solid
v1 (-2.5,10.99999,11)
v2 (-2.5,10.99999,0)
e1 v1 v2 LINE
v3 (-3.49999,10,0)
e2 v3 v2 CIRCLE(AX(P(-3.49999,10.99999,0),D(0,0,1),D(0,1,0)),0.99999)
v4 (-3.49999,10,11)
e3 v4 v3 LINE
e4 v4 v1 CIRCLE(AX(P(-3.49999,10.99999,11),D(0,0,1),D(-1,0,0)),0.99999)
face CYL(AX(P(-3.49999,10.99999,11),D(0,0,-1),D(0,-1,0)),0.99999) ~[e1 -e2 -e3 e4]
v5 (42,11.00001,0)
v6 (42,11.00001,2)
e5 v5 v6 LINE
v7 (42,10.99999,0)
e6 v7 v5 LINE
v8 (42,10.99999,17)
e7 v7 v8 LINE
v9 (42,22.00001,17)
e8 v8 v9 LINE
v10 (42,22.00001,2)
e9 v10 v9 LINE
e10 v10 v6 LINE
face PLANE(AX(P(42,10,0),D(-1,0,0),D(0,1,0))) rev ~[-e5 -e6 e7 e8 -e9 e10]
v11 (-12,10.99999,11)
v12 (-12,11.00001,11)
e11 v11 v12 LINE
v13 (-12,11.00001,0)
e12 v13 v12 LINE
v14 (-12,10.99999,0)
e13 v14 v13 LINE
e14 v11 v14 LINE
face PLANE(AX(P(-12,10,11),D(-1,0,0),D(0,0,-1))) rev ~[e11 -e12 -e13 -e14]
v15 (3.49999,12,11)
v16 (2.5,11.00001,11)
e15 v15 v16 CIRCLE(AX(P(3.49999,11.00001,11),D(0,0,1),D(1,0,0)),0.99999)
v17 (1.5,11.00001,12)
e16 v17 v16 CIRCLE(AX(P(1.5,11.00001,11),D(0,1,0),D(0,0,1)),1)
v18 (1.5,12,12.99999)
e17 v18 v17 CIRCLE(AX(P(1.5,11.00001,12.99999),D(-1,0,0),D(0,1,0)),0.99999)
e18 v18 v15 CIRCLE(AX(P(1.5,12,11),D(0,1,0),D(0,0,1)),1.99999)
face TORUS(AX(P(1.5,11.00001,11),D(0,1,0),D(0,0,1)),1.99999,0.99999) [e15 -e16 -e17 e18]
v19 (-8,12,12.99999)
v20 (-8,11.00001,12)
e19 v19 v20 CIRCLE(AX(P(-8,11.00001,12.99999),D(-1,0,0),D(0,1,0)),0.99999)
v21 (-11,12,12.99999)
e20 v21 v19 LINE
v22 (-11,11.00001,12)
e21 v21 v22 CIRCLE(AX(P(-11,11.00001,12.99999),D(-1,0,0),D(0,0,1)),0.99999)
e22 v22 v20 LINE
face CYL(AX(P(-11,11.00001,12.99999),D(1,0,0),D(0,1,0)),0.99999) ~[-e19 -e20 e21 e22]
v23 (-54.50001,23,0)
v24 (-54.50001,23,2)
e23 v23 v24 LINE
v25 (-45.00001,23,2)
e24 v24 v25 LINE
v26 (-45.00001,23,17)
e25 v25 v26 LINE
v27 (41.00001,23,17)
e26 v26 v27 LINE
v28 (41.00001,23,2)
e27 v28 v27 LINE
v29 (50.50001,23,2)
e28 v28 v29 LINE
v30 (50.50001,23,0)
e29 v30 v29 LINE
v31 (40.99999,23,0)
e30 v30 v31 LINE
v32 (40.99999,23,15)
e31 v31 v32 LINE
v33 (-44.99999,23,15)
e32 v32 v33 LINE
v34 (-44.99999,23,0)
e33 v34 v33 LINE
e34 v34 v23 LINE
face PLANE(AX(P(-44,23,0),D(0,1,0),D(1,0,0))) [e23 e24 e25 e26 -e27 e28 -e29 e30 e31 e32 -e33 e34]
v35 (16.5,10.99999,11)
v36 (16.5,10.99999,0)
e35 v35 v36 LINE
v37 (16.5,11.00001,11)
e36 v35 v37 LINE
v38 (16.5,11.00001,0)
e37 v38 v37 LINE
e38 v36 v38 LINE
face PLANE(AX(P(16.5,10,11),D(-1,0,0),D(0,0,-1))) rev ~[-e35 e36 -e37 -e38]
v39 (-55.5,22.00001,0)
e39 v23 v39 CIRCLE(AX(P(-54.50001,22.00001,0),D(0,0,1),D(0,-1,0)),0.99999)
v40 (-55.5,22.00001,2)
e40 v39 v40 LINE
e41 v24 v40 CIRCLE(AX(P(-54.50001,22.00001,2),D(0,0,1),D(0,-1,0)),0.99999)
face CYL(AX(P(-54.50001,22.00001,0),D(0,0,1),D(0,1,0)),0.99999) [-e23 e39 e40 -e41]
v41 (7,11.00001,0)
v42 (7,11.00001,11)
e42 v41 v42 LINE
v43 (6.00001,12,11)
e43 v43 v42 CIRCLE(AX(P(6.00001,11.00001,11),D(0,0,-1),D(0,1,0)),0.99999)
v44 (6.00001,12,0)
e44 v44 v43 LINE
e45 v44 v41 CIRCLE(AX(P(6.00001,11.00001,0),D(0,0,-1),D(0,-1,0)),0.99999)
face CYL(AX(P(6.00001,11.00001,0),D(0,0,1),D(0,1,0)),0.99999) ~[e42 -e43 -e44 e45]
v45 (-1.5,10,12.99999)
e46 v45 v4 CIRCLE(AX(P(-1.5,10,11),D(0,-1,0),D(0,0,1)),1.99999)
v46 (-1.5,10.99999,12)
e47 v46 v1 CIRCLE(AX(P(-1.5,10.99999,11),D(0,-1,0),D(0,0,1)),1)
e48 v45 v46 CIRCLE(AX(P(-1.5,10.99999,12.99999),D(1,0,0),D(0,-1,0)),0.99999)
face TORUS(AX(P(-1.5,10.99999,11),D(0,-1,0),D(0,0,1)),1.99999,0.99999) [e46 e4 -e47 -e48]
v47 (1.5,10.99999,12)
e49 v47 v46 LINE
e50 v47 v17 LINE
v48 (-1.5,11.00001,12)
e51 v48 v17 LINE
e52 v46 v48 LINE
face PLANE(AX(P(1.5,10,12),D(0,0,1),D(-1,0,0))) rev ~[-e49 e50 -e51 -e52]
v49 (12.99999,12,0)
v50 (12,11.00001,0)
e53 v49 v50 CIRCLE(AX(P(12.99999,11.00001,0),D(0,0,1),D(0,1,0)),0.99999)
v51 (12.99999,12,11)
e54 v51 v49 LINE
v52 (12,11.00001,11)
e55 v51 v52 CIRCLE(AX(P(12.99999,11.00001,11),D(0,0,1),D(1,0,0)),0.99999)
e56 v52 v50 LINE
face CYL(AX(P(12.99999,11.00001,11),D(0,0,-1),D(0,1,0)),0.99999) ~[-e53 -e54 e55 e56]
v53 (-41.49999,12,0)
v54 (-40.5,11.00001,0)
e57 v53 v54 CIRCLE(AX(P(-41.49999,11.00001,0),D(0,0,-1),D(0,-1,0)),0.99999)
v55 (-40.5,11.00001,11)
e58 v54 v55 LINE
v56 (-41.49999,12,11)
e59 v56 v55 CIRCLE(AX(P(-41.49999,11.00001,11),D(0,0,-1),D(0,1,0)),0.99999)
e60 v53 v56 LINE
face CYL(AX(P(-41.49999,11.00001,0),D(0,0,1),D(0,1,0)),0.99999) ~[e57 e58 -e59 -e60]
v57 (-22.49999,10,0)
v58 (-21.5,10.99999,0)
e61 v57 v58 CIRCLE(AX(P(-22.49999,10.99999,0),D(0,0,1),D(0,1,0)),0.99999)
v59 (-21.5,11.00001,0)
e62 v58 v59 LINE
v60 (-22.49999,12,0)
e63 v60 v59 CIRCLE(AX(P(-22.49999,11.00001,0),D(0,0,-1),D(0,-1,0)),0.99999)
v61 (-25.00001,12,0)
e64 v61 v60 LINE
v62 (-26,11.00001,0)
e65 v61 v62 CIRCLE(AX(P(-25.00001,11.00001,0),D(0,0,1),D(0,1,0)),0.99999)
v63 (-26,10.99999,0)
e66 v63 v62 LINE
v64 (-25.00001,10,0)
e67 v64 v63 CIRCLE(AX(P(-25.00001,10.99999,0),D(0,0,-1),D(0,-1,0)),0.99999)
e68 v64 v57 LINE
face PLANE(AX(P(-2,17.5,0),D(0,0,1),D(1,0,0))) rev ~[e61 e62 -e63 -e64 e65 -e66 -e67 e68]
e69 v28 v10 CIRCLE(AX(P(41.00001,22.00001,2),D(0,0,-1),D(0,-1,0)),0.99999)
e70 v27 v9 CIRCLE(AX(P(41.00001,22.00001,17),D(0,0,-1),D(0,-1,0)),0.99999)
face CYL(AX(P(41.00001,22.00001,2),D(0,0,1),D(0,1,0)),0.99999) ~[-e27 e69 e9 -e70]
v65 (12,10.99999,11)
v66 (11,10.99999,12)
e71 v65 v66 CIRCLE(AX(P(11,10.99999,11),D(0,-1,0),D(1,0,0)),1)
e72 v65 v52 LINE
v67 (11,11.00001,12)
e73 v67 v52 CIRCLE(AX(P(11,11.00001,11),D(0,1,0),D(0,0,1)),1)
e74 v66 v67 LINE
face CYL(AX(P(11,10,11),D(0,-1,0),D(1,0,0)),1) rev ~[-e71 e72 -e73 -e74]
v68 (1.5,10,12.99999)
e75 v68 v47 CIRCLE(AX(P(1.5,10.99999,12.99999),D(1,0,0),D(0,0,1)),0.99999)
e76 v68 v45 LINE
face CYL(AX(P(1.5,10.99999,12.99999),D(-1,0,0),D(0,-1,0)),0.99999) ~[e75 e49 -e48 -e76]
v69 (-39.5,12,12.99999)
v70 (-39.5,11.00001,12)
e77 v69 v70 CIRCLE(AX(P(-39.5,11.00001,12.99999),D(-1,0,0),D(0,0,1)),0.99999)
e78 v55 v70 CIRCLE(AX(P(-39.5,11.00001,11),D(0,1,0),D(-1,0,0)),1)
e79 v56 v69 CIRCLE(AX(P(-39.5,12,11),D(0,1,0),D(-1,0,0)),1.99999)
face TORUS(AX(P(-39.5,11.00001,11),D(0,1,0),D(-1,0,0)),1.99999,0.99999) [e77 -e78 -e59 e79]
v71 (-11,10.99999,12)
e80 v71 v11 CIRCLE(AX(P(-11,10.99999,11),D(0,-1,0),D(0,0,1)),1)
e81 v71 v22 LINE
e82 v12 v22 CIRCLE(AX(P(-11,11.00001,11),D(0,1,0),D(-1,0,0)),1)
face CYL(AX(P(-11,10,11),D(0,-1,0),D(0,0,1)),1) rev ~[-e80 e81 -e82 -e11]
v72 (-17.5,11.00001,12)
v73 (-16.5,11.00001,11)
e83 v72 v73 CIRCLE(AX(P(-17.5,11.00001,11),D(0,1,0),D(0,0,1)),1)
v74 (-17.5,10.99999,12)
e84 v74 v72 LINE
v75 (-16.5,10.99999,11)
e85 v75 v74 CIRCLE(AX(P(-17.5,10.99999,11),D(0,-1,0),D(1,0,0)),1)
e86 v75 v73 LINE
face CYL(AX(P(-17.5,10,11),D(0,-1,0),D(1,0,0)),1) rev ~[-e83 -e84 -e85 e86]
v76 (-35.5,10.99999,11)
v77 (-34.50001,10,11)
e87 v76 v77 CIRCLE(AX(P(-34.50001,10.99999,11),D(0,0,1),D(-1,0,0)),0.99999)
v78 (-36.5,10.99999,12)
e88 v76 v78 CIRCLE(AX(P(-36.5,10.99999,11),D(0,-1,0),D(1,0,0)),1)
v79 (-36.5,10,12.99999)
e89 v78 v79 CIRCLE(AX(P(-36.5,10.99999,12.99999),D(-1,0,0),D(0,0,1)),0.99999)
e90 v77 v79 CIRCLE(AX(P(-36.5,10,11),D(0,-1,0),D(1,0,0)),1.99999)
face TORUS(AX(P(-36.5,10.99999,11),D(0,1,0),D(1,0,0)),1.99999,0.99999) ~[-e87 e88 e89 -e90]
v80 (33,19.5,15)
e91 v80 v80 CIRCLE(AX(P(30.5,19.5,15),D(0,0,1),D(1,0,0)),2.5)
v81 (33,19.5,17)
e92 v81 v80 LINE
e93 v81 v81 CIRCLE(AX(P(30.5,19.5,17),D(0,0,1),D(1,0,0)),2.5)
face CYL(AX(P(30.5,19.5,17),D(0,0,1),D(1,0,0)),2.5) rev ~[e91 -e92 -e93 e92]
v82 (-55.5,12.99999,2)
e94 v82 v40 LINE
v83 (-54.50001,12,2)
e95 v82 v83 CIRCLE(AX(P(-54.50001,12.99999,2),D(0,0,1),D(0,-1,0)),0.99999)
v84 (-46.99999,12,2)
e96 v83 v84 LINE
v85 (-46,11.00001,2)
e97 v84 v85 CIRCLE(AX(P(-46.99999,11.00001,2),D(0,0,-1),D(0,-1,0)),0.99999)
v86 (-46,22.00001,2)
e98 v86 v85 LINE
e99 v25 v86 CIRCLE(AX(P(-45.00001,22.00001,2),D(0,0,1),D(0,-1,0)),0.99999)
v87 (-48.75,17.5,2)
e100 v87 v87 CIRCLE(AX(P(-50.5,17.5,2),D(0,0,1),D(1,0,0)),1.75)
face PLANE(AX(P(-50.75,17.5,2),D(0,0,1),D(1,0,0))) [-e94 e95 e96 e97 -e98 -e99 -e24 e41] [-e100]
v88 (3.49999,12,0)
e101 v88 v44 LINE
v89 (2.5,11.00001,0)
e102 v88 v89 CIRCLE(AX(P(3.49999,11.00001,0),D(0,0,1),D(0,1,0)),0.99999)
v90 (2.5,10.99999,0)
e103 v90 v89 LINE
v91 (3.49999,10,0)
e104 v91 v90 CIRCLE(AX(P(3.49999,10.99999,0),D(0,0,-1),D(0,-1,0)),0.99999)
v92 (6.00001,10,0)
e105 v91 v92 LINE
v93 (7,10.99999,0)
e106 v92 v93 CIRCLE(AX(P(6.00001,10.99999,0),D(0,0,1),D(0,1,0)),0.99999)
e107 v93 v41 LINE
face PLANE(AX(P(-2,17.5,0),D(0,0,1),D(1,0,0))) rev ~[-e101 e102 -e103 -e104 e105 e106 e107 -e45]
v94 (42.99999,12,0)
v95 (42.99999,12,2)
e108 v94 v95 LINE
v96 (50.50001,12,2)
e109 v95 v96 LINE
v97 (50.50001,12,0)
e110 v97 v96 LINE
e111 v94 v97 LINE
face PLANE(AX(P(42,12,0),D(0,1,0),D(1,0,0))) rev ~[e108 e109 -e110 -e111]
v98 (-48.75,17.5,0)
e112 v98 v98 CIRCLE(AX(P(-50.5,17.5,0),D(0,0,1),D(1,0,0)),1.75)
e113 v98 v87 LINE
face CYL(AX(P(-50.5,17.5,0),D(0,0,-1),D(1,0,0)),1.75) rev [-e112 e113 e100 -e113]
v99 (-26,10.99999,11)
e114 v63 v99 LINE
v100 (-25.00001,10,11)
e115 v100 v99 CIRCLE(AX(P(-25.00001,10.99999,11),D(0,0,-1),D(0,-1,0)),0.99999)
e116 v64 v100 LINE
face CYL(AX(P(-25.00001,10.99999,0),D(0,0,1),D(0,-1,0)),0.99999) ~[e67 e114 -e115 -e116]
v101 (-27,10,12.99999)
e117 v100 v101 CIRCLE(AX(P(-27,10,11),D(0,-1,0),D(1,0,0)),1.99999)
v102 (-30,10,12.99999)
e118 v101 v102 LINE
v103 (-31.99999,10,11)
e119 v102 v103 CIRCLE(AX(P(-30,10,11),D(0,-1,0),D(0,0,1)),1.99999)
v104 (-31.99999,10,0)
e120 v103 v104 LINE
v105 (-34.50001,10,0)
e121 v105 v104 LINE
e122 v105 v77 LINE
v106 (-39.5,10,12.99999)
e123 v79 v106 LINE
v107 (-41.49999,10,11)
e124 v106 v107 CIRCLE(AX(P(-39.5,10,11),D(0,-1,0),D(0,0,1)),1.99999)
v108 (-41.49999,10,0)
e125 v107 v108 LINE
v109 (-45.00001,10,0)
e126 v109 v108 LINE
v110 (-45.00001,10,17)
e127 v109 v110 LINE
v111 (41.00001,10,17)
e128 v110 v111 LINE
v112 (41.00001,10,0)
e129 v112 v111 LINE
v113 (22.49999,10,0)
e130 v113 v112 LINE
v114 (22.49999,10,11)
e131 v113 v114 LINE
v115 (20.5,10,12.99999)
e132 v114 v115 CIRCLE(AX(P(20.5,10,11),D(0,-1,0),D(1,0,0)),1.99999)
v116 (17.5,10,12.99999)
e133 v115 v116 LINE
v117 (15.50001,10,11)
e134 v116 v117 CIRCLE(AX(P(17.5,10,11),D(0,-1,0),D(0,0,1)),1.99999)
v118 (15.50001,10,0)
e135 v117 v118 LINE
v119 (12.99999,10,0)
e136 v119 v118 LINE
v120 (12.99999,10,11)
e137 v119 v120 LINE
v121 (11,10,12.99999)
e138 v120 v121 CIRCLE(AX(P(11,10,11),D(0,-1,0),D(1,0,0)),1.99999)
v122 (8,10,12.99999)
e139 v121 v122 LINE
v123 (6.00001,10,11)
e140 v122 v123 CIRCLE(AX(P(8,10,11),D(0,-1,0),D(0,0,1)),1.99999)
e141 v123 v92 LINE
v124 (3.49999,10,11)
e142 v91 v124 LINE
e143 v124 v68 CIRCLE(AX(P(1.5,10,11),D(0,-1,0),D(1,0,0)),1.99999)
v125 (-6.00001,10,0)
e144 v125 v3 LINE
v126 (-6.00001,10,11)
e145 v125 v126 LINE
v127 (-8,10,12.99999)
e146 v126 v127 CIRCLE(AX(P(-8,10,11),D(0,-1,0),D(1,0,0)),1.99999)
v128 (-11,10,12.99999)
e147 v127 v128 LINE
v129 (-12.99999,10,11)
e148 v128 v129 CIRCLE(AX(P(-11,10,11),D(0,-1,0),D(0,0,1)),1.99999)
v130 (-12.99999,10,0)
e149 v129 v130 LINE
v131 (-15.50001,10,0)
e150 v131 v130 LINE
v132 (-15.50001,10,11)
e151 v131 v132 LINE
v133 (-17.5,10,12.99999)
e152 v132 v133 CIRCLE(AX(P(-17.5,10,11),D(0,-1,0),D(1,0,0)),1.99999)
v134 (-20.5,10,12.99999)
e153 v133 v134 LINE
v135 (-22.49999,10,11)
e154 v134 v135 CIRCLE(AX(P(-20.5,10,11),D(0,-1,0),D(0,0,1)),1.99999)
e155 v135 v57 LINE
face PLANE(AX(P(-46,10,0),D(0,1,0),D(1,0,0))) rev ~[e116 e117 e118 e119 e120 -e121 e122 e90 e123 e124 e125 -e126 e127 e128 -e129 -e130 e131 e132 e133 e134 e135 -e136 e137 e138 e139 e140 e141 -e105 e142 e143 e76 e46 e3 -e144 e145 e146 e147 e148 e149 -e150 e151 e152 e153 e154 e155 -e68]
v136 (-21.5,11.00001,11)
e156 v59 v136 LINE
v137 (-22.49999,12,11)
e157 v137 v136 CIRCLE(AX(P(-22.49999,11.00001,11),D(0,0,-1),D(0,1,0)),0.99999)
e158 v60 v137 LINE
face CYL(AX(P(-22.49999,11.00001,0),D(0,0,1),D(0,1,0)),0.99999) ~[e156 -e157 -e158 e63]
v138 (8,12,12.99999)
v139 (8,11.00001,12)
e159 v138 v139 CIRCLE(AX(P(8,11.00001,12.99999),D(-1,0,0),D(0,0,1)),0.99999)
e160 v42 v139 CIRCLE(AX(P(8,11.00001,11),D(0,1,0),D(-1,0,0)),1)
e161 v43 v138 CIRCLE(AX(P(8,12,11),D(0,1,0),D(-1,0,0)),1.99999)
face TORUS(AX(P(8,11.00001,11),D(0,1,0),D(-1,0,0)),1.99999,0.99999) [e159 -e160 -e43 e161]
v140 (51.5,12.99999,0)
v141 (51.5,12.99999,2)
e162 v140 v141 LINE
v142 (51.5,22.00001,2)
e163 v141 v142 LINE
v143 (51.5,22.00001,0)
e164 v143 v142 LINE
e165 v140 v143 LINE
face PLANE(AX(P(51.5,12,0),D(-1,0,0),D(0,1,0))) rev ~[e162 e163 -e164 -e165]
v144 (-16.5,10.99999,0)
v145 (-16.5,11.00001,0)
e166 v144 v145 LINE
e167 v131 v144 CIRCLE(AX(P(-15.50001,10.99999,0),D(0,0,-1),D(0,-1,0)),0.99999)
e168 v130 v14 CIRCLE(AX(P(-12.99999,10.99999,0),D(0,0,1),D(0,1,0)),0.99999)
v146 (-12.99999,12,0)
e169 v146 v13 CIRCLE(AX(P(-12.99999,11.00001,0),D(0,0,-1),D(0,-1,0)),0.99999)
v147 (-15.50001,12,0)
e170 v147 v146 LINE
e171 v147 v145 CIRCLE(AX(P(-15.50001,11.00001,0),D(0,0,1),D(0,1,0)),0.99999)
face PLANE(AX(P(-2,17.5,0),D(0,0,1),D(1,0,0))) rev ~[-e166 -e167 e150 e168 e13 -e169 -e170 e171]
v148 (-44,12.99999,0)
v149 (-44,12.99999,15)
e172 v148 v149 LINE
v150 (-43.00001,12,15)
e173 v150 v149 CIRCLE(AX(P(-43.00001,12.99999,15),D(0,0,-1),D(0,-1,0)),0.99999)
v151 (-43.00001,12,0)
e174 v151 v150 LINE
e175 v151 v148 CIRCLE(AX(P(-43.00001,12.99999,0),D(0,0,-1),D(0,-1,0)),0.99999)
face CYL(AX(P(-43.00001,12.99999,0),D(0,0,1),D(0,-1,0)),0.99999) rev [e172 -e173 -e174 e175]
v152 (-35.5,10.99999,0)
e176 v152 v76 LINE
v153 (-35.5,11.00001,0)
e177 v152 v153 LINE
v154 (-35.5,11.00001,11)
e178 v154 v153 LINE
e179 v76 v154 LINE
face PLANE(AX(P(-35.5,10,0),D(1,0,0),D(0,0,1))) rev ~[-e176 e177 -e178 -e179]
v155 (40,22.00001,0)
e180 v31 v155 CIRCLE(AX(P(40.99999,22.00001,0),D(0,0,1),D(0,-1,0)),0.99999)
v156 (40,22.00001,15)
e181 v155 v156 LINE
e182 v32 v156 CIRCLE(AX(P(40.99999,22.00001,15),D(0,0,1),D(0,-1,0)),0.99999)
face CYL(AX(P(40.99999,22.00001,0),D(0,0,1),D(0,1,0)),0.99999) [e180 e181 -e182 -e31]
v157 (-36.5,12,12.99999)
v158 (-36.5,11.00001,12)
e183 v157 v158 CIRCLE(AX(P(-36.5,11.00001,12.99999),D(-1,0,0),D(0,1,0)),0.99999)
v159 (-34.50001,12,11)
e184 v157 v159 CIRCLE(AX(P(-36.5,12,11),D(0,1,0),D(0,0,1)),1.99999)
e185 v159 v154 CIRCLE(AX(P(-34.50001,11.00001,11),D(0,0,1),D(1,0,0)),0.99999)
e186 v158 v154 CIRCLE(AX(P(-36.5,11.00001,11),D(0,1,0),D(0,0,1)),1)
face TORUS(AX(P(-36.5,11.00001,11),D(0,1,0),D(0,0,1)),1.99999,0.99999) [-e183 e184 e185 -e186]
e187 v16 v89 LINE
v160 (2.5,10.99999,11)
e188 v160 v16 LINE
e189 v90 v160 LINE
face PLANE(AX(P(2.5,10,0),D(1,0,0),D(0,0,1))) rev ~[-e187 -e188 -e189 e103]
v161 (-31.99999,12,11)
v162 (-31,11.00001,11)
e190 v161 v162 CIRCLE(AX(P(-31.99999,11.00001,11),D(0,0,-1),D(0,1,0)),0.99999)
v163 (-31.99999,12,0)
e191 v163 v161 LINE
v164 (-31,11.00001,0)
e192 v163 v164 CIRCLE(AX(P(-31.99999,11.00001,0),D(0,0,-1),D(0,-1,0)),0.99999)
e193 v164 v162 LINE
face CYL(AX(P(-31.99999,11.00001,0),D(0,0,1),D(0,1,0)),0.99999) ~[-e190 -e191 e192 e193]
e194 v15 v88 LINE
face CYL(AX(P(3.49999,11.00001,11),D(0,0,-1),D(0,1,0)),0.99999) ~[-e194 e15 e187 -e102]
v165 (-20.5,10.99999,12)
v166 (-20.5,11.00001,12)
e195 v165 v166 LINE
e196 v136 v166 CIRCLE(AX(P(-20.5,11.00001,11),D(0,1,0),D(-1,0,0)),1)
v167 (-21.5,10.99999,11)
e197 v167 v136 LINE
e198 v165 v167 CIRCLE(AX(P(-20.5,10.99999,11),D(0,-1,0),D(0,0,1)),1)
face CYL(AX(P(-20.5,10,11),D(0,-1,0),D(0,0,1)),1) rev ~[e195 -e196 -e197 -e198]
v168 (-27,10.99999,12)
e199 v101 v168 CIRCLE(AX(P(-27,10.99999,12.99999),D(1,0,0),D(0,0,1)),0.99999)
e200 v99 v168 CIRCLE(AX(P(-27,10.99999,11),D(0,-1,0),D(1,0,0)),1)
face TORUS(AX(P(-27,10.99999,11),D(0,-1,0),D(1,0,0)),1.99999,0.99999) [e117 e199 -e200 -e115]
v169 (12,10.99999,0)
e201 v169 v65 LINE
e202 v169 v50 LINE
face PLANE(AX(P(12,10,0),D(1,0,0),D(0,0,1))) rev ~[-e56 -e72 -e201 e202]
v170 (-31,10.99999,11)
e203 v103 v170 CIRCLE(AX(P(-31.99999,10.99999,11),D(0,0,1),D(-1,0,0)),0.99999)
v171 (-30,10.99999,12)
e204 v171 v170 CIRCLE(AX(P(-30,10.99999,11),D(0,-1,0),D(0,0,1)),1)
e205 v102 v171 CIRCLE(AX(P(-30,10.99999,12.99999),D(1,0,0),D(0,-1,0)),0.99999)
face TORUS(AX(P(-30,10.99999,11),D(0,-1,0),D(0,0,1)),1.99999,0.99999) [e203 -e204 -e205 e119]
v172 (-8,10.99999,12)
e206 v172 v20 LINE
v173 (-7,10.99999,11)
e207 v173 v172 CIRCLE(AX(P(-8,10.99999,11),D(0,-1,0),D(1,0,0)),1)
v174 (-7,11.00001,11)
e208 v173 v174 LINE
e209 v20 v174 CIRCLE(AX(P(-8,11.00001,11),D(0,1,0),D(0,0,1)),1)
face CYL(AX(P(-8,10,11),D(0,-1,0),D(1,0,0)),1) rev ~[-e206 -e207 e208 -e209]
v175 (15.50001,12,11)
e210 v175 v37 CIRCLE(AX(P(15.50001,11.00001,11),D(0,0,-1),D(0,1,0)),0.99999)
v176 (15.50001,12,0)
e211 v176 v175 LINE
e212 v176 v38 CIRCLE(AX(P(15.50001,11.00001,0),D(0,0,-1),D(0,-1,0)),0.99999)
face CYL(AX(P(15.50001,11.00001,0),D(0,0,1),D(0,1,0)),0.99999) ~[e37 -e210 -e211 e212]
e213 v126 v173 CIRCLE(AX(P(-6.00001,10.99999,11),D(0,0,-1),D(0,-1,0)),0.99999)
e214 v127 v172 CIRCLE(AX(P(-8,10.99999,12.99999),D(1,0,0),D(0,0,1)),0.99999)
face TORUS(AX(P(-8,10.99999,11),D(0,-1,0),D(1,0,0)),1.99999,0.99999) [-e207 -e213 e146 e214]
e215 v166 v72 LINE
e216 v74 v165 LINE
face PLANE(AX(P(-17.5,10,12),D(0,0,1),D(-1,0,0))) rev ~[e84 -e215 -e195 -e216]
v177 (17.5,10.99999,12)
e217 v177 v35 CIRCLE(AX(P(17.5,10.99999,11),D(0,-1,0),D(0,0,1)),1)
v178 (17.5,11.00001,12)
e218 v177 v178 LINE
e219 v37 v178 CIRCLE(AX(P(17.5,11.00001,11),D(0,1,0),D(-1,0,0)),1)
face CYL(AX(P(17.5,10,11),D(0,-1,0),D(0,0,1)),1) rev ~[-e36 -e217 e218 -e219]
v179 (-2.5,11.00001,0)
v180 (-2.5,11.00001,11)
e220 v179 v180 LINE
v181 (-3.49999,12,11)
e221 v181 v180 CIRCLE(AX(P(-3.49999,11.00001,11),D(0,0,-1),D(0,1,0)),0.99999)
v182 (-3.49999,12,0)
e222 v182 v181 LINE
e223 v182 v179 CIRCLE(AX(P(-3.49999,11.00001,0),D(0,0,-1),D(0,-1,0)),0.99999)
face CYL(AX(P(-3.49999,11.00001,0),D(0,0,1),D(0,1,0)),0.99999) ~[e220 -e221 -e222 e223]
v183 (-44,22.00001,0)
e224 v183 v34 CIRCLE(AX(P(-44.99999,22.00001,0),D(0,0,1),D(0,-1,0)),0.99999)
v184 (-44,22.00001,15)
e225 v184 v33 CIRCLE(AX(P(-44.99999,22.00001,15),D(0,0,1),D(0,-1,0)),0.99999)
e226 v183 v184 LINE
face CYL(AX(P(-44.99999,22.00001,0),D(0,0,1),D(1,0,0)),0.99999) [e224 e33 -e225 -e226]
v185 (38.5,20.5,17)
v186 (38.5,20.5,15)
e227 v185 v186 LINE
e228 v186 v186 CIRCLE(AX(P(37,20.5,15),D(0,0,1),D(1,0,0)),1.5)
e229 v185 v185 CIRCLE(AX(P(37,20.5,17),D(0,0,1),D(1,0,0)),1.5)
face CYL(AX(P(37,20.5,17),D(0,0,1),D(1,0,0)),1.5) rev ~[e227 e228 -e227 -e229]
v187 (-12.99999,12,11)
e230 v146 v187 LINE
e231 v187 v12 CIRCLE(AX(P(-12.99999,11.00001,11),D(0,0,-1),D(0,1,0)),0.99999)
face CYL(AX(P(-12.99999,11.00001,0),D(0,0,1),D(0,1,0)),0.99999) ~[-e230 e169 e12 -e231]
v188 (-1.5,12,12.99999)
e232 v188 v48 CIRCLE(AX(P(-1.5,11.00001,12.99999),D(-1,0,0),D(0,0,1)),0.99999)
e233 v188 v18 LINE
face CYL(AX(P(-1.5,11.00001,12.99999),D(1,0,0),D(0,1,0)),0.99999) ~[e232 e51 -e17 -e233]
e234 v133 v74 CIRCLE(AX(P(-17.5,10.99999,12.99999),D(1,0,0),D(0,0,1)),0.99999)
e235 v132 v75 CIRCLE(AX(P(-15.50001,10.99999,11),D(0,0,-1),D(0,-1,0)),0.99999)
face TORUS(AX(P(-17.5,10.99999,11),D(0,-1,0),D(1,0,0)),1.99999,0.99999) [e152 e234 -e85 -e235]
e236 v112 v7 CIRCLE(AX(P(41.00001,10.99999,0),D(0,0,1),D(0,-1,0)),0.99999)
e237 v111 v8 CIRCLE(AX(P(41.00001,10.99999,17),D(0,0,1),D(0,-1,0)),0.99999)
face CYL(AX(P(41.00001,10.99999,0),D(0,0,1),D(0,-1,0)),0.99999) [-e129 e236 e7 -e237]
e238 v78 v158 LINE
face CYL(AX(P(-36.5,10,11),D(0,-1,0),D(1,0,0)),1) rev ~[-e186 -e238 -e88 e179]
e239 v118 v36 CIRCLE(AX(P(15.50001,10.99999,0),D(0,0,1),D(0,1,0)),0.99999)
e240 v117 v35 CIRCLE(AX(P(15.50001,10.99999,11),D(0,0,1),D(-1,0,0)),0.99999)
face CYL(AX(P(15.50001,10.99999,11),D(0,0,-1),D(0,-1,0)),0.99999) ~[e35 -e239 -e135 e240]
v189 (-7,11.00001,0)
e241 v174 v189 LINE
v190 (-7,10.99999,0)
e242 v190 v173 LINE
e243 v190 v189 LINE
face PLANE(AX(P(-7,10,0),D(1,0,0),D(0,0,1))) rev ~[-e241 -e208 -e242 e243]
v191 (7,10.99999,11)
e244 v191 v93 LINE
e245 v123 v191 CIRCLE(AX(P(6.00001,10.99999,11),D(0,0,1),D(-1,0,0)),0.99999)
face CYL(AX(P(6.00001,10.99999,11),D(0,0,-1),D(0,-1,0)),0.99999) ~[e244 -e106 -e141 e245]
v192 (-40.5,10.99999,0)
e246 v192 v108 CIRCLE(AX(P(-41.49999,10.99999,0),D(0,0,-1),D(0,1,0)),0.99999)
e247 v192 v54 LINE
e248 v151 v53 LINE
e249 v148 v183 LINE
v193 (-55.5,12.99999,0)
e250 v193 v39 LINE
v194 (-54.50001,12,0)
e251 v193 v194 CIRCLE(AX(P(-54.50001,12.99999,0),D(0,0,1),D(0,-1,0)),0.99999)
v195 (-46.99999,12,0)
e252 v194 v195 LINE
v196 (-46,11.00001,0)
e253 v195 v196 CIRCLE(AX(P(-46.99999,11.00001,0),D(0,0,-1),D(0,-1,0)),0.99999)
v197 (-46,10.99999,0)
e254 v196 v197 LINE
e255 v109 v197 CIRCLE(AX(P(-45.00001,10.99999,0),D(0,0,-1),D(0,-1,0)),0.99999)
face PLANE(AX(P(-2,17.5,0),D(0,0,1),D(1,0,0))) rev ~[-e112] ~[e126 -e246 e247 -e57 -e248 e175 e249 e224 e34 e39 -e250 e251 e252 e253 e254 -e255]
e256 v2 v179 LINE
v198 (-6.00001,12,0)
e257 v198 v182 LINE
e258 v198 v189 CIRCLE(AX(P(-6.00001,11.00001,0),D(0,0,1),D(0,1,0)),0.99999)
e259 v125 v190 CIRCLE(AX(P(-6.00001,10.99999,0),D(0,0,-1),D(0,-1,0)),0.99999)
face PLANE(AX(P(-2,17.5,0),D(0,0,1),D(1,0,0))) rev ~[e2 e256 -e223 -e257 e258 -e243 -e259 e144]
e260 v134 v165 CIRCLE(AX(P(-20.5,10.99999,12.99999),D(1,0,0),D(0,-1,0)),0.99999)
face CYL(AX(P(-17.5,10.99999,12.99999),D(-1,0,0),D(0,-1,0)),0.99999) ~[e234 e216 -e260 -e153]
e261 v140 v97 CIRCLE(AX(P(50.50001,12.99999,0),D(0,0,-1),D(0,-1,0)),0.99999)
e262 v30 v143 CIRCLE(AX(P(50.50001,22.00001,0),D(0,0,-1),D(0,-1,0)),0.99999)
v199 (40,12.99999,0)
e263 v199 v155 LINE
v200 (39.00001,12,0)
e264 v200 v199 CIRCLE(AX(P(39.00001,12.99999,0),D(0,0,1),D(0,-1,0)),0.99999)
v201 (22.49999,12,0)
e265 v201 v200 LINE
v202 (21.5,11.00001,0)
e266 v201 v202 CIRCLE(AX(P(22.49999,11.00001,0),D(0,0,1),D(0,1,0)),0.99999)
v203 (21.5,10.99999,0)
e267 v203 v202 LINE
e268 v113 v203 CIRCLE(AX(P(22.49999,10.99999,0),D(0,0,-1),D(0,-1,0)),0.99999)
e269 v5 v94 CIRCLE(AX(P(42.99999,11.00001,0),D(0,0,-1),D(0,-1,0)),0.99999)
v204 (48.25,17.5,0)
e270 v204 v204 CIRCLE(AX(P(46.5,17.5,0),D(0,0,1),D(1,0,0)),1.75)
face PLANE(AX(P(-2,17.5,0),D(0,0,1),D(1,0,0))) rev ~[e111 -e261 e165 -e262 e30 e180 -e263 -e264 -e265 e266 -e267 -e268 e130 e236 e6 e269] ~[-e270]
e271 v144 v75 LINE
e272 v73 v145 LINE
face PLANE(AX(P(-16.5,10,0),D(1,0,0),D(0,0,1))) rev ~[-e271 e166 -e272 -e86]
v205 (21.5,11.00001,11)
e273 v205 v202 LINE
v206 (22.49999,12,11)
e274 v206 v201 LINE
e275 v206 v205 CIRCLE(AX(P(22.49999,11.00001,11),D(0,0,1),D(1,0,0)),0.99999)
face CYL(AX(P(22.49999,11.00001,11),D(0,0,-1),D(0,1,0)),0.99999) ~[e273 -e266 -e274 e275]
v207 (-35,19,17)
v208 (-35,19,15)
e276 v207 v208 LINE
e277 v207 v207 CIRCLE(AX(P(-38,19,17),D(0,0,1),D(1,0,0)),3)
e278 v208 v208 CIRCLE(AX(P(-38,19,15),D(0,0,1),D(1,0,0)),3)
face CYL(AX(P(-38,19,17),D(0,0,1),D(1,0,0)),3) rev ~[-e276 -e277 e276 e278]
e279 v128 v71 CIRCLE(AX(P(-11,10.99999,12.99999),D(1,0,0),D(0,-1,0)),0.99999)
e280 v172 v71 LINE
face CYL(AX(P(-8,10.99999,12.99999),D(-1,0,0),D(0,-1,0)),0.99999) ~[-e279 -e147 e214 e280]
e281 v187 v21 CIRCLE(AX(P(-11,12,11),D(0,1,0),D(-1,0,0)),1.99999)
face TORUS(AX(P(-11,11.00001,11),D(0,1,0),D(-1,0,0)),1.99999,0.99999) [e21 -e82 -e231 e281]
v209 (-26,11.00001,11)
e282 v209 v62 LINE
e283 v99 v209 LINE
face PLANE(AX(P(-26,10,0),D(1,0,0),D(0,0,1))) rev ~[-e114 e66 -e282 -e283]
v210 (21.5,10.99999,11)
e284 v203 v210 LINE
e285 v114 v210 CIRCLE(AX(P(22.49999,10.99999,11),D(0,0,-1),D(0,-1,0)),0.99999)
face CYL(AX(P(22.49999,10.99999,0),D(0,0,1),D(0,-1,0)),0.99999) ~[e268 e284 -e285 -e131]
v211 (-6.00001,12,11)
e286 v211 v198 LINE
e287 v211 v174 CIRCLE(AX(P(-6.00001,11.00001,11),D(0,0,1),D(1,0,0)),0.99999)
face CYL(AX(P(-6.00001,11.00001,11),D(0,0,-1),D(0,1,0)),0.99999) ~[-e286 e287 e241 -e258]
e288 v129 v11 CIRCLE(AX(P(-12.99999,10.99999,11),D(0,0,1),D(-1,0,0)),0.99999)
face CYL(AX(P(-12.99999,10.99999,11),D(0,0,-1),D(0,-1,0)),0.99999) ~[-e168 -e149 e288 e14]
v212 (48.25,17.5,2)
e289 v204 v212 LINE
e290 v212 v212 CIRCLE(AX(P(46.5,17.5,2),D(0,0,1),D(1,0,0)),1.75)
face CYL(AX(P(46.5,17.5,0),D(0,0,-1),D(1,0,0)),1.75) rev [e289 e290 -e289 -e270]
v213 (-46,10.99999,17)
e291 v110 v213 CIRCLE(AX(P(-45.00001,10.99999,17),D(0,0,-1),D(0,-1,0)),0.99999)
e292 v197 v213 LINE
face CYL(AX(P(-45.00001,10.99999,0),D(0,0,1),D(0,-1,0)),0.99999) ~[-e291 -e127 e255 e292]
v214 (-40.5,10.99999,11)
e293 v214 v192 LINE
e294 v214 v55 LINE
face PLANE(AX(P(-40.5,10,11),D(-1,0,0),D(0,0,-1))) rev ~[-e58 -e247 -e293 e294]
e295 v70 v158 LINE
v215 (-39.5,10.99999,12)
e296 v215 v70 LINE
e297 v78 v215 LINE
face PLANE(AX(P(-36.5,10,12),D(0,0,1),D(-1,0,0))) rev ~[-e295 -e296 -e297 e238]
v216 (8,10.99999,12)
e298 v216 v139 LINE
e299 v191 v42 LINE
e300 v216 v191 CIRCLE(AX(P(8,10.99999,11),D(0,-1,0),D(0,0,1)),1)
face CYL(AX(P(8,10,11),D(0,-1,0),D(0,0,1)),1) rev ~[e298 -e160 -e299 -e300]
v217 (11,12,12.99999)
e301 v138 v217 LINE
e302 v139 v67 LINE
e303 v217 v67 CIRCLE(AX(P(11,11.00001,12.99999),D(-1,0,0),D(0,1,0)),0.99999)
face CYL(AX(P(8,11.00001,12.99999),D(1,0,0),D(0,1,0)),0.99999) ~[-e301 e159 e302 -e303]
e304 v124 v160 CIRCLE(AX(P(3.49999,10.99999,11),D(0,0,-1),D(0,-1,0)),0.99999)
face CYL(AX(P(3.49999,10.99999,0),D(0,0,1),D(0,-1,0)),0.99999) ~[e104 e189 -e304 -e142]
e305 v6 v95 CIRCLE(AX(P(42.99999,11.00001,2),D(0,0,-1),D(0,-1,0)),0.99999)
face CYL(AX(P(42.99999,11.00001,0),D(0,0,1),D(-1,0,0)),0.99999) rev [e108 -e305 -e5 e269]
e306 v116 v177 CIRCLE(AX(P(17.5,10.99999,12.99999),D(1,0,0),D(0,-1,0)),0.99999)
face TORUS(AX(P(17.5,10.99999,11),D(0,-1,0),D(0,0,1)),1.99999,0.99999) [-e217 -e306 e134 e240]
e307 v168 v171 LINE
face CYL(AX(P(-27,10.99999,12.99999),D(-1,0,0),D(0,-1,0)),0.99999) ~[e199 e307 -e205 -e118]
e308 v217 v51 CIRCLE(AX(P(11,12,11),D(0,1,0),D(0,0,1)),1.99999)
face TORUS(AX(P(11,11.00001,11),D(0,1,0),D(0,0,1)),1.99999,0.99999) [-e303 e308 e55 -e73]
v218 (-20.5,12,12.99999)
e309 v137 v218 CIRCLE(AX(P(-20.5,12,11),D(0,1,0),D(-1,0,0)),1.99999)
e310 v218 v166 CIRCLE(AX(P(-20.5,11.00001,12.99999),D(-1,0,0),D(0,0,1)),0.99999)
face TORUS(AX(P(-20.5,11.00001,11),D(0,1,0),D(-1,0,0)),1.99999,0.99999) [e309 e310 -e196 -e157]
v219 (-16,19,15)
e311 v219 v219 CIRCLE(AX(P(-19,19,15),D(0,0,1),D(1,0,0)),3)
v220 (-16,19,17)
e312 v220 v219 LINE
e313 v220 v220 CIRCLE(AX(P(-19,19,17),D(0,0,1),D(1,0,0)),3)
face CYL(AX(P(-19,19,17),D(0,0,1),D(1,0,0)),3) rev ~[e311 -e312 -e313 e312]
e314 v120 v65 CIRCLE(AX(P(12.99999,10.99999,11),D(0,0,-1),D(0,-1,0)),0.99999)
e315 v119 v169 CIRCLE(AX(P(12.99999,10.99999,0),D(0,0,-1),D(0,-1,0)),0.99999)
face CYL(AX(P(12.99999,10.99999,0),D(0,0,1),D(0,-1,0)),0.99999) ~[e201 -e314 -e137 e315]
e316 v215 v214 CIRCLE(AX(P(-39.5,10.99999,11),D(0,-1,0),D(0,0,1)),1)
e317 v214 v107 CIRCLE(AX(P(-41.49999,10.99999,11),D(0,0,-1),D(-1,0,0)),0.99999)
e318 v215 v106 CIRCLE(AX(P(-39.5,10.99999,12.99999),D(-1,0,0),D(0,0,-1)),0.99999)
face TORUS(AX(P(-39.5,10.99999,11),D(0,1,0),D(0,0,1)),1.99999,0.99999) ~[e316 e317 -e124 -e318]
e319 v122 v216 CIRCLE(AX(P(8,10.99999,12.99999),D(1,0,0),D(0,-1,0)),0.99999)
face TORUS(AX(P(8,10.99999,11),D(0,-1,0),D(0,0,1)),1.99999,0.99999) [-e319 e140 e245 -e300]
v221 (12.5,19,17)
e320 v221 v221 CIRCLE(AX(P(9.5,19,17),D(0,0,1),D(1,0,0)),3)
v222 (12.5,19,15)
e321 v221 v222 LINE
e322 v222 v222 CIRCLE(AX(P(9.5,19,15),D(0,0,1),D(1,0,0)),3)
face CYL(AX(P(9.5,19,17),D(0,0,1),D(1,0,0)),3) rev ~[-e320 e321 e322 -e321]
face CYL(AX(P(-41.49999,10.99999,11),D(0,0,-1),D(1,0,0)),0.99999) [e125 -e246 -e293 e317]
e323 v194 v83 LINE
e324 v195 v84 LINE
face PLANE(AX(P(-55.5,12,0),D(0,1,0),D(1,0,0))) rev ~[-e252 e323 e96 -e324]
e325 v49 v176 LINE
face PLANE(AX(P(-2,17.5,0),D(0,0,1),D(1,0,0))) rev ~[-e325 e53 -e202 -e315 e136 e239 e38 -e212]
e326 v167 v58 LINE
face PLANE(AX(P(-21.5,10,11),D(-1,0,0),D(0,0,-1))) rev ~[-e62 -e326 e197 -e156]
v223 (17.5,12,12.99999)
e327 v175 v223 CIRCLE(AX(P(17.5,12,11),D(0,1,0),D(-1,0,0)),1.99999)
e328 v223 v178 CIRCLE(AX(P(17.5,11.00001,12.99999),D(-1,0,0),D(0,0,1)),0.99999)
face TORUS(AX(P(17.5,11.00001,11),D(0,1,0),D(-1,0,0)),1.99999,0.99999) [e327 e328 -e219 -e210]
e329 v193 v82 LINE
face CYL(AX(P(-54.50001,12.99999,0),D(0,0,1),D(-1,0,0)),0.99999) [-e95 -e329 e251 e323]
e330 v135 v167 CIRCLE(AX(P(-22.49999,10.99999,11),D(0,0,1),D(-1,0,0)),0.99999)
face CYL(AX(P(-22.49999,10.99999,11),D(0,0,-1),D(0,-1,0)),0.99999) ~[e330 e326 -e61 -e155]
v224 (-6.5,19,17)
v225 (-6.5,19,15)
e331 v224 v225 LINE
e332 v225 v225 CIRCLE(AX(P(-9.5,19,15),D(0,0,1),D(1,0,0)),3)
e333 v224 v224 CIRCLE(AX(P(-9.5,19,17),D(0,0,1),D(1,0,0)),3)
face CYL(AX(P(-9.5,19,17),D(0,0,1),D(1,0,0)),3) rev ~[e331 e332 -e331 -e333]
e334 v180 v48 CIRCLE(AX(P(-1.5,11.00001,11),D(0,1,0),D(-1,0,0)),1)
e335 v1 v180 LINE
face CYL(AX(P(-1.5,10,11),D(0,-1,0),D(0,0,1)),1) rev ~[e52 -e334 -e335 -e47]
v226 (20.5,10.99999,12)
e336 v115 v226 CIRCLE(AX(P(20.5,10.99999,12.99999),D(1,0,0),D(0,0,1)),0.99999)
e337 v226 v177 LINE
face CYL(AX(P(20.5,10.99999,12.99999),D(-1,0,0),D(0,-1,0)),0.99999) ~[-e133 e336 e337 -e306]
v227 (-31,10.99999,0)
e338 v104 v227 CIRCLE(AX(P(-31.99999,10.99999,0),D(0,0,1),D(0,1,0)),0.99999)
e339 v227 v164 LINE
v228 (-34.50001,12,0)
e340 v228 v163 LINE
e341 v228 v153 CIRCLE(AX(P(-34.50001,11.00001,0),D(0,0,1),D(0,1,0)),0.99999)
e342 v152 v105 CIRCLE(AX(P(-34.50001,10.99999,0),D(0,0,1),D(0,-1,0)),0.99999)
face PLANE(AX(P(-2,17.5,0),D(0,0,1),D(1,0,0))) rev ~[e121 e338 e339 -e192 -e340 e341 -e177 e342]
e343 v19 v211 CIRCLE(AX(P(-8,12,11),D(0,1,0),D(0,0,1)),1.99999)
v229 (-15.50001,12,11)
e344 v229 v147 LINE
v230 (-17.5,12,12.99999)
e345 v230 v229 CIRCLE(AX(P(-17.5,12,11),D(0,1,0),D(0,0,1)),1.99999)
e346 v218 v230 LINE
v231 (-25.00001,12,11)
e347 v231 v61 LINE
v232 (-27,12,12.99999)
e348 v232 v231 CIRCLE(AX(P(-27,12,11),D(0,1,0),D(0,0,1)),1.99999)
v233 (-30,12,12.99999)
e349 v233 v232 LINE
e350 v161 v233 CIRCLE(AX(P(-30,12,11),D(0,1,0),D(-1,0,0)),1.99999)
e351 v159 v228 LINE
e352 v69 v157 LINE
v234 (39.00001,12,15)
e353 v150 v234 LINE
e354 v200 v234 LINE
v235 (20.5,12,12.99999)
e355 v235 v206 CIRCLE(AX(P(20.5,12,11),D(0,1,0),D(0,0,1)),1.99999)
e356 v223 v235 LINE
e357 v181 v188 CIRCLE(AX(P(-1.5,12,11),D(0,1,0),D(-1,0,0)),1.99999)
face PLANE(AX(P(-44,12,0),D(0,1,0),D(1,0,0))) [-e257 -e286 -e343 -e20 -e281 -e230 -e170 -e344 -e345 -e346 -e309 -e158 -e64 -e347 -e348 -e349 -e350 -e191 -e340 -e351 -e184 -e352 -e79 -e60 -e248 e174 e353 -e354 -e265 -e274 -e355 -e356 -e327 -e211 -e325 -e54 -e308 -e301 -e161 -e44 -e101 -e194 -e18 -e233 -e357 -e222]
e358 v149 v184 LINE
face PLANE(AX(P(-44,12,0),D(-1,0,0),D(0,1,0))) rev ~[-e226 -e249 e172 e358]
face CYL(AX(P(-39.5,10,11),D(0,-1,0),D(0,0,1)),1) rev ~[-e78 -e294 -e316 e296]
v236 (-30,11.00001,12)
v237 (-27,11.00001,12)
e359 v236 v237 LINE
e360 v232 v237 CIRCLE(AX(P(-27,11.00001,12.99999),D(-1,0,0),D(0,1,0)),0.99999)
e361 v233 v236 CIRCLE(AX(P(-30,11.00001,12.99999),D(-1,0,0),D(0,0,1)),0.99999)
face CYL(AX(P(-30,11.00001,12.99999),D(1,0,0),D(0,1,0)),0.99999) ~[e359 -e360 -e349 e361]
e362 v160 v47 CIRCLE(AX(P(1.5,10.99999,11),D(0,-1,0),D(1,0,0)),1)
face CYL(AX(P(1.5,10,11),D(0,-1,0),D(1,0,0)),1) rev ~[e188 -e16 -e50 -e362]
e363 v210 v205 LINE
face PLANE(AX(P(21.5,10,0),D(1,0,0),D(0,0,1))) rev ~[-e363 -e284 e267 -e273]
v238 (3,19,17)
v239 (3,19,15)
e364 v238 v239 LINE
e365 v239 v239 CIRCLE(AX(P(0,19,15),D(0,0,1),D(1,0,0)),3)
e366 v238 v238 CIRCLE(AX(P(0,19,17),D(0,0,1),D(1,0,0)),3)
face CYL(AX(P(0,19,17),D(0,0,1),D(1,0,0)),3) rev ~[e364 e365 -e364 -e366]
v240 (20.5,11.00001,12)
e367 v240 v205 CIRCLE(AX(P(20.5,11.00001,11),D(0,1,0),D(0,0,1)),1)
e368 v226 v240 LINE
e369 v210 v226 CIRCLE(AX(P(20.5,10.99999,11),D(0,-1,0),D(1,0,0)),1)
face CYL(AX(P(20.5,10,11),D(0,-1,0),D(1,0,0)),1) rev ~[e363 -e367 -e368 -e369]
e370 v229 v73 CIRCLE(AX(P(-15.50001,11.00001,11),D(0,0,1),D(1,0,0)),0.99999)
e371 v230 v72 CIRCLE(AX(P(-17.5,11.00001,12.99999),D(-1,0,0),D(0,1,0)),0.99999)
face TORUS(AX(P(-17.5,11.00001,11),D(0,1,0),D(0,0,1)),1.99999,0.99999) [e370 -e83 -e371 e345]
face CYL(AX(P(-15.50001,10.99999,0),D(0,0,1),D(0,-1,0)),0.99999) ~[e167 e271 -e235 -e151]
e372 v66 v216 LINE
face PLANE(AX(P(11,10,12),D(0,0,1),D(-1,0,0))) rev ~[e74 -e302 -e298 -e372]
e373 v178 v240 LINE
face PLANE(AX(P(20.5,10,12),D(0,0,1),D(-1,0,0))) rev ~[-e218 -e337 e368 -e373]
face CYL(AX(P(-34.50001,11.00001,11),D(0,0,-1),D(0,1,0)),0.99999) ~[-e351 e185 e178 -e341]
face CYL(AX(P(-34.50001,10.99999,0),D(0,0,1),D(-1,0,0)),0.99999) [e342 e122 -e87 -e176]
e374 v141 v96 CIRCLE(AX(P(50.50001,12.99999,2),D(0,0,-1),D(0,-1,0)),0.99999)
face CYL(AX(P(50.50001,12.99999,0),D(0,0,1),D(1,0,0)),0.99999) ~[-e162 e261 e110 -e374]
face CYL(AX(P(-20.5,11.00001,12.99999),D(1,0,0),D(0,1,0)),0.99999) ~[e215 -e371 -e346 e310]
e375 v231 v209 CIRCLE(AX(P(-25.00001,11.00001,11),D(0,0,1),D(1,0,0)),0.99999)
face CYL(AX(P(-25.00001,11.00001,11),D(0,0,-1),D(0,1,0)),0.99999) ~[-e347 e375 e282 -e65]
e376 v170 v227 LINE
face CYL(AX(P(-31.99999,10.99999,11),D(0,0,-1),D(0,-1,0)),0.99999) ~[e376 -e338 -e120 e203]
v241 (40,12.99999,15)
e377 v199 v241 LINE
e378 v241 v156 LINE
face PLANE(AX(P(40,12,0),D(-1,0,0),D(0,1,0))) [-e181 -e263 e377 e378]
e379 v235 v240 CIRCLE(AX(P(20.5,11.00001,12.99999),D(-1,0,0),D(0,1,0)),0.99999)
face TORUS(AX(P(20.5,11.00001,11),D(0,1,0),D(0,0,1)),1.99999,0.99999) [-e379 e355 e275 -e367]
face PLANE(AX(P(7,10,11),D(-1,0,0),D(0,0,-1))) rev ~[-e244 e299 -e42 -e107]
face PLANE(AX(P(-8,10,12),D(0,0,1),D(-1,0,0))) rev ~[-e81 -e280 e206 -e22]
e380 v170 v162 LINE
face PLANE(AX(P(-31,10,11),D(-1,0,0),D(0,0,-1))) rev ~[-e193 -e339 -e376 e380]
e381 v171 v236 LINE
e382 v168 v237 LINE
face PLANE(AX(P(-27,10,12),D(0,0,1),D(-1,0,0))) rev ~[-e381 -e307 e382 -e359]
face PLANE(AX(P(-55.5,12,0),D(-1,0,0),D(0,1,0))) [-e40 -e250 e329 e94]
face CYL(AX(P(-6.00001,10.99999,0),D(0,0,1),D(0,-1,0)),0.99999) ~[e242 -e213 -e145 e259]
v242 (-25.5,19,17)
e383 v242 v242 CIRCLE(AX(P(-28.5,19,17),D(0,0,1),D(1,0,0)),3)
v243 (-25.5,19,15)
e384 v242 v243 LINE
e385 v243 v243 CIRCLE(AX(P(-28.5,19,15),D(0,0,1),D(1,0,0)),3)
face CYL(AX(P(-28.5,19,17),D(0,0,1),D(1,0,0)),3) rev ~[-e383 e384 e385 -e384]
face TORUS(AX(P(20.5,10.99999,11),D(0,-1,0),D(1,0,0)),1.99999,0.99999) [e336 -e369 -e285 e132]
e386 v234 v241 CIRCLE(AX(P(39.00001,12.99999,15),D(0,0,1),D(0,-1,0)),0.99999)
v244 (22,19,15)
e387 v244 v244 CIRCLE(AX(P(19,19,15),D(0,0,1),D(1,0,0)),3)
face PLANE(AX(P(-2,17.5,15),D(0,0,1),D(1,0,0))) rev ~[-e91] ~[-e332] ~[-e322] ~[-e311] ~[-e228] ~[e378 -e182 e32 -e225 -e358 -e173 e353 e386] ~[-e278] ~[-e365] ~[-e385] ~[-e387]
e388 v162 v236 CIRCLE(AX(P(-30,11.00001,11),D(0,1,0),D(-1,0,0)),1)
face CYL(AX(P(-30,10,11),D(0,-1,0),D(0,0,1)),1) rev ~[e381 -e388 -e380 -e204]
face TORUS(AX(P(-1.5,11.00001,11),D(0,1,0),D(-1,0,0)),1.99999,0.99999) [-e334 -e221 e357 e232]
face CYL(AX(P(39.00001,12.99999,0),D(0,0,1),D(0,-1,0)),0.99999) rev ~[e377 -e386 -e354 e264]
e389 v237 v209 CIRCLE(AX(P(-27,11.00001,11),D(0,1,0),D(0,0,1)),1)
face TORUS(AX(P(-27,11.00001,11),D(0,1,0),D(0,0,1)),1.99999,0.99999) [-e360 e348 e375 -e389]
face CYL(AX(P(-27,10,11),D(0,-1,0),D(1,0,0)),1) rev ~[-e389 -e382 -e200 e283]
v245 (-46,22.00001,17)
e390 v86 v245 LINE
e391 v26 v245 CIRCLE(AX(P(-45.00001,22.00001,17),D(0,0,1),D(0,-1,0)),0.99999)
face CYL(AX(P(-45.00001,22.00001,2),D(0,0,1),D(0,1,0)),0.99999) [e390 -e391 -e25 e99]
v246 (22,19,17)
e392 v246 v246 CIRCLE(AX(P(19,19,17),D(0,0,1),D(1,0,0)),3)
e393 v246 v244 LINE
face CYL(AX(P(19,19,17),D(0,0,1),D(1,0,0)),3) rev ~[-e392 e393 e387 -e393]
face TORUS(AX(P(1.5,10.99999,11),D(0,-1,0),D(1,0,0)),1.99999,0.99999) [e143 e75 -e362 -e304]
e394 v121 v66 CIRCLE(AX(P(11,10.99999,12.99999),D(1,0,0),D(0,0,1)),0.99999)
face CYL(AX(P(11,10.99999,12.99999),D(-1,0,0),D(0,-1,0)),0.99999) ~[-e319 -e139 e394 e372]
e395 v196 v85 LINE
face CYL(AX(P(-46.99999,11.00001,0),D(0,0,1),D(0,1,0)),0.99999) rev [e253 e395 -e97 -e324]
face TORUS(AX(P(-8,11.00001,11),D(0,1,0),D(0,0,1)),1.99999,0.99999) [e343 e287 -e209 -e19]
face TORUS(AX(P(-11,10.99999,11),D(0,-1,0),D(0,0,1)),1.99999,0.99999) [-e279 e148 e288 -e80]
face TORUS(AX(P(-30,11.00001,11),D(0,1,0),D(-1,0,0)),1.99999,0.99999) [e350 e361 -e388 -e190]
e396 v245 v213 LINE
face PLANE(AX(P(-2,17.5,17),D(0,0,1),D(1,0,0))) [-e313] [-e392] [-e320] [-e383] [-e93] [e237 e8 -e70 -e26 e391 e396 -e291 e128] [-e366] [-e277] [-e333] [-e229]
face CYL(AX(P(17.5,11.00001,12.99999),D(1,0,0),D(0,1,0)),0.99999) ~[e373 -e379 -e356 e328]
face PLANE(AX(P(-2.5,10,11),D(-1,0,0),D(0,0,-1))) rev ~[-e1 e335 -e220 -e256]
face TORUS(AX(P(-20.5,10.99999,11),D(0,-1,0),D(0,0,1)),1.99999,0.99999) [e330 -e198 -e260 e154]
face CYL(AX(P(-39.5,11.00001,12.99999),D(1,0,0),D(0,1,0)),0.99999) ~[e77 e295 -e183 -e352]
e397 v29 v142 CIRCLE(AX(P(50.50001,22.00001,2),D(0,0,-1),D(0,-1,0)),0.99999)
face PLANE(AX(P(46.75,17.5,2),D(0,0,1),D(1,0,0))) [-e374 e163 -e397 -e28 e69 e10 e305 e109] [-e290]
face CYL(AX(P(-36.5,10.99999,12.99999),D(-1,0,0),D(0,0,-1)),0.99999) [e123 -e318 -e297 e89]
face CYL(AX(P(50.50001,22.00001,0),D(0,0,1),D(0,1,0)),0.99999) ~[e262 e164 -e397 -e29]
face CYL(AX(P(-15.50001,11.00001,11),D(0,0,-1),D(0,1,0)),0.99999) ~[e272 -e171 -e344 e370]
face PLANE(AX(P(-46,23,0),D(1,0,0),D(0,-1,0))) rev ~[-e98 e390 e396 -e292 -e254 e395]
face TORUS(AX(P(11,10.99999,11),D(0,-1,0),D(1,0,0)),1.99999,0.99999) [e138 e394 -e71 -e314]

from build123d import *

# Parameters (mm, degrees)
F0_W     = 9.5
F0_H     = 11
F0_R     = 1.75
F1_DEPTH = 2
F2_DEPTH = 17
F0_W_2   = 84
F3_DEPTH = 17
F4_DEPTH = 15
F6_DEPTH = 13.001
F7_R     = 3
F7_R_2   = 2.5
F7_R_3   = 1.5
F8_DEPTH = 25
F9_R     = 0.99999
F10_R    = 0.99999


# Not quite as in the source:
# - a fillet or chamfer is up to 0.001 mm smaller than in the source, because OpenCascade refuses the exact size


with BuildPart() as f1:
    # F0 (on Top) → F1 (new body)
    with BuildSketch(Plane.XY):
        with Locations((46.75, 17.5)):
            Rectangle(F0_W, F0_H)
        with Locations((46.5, 17.5)):
            Circle(F0_R, mode=Mode.SUBTRACT)
    extrude(amount=F1_DEPTH)



with BuildPart() as f1b:
    # F0 (on Top) → F1, piece 2 (new body)
    with BuildSketch(Plane.XY):
        with Locations((-50.75, 17.5)):
            Rectangle(F0_W, F0_H)
        with Locations((-50.5, 17.5)):
            Circle(F0_R, mode=Mode.SUBTRACT)
    extrude(amount=F1_DEPTH)


with BuildPart() as f1_1:
    add(f1.part)

    add(f1b.part)  # F2 merges F1b
    # F0 (on Top) → F2 (join)
    with BuildSketch(Plane.XY):
        Polygon((-44, 23), (-46, 23), (-46, 12), (-46, 10), (42, 10), (42, 12), (42, 23), (40, 23), (40, 12), (-44, 12), align=None)
    extrude(amount=F2_DEPTH)

    # F0 (on Top) → F3 (join)
    with BuildSketch(Plane.XY):
        with Locations((-2, 17.5)):
            Rectangle(F0_W_2, F0_H)
    extrude(amount=F3_DEPTH)

    # F0 (on Top) → F4 (cut)
    with BuildSketch(Plane.XY):
        with Locations((-2, 17.5)):
            Rectangle(F0_W_2, F0_H)
    extrude(amount=F4_DEPTH, mode=Mode.SUBTRACT)

    # F5 (on face) → F6 (cut, through all)
    with BuildSketch(Plane.XZ.offset(-10)):
        with BuildLine():
            Line((-36.5, 12), (-39.5, 12))
            ThreePointArc((-39.5, 12), (-40.2071067812, 11.7071067812), (-40.5, 11))
            Line((-40.5, 11), (-40.5, 0))
            Line((-40.5, 0), (-35.5, 0))
            Line((-35.5, 0), (-35.5, 11))
            ThreePointArc((-35.5, 11), (-35.7928932188, 11.7071067812), (-36.5, 12))
        make_face()
        with BuildLine():
            Line((-31, 11), (-31, 0))
            Line((-31, 0), (-26, 0))
            Line((-26, 0), (-26, 11))
            ThreePointArc((-26, 11), (-26.2928932188, 11.7071067812), (-27, 12))
            Line((-27, 12), (-30, 12))
            ThreePointArc((-30, 12), (-30.7071067812, 11.7071067812), (-31, 11))
        make_face()
        with BuildLine():
            Line((-21.5, 11), (-21.5, 0))
            Line((-21.5, 0), (-16.5, 0))
            Line((-16.5, 0), (-16.5, 11))
            ThreePointArc((-16.5, 11), (-16.7928932188, 11.7071067812), (-17.5, 12))
            Line((-17.5, 12), (-20.5, 12))
            ThreePointArc((-20.5, 12), (-21.2071067812, 11.7071067812), (-21.5, 11))
        make_face()
        with BuildLine():
            Line((-12, 11), (-12, 0))
            Line((-12, 0), (-7, 0))
            Line((-7, 0), (-7, 11))
            ThreePointArc((-7, 11), (-7.2928932188, 11.7071067812), (-8, 12))
            Line((-8, 12), (-11, 12))
            ThreePointArc((-11, 12), (-11.7071067812, 11.7071067812), (-12, 11))
        make_face()
        with BuildLine():
            Line((-2.5, 11), (-2.5, 0))
            Line((-2.5, 0), (2.5, 0))
            Line((2.5, 0), (2.5, 11))
            ThreePointArc((2.5, 11), (2.2071067812, 11.7071067812), (1.5, 12))
            Line((1.5, 12), (-1.5, 12))
            ThreePointArc((-1.5, 12), (-2.2071067812, 11.7071067812), (-2.5, 11))
        make_face()
        with BuildLine():
            Line((7, 0), (12, 0))
            Line((12, 0), (12, 11))
            ThreePointArc((12, 11), (11.7071067812, 11.7071067812), (11, 12))
            Line((11, 12), (8, 12))
            ThreePointArc((8, 12), (7.2928932188, 11.7071067812), (7, 11))
            Line((7, 11), (7, 0))
        make_face()
        with BuildLine():
            Line((16.5, 0), (21.5, 0))
            Line((21.5, 0), (21.5, 11))
            ThreePointArc((21.5, 11), (21.2071067812, 11.7071067812), (20.5, 12))
            Line((20.5, 12), (17.5, 12))
            ThreePointArc((17.5, 12), (16.7928932188, 11.7071067812), (16.5, 11))
            Line((16.5, 11), (16.5, 0))
        make_face()
    extrude(amount=-F6_DEPTH, mode=Mode.SUBTRACT)

    # F7 (on face) → F8 (cut)
    with BuildSketch(Plane.XY.offset(17)):
        with Locations((-38, 19)):
            Circle(F7_R)
        with Locations((-28.5, 19)):
            Circle(F7_R)
        with Locations((-19, 19)):
            Circle(F7_R)
        with Locations((-9.5, 19)):
            Circle(F7_R)
        with Locations((9.5, 19)):
            Circle(F7_R)
        with Locations((19, 19)):
            Circle(F7_R)
        with Locations((30.5, 19.5)):
            Circle(F7_R_2)
        with Locations((37, 20.5)):
            Circle(F7_R_3)
        with Locations((0, 19)):
            Circle(F7_R)
    extrude(amount=-F8_DEPTH, mode=Mode.SUBTRACT)

    # F9 (radius 1 in the source; OpenCascade refuses exactly that, so slightly less here)
    f9_edges = [f1_1.edges().sort_by_distance(p)[0] for p in [
        (-40.5, 10, 5.5),
        (-40.5, 12, 5.5),
        (-31, 10, 5.5),
        (-31, 12, 5.5),
        (-21.5, 10, 5.5),
        (-21.5, 12, 5.5),
        (-12, 10, 5.5),
        (-12, 12, 5.5),
        (-2.5, 10, 5.5),
        (-2.5, 12, 5.5),
        (7, 10, 5.5),
        (7, 12, 5.5),
        (16.5, 10, 5.5),
        (16.5, 12, 5.5),
    ]]
    fillet(f9_edges, radius=F9_R)

    # F10 (radius 1 in the source; OpenCascade refuses exactly that, so slightly less here)
    f10_edges = [f1_1.edges().sort_by_distance(p)[0] for p in [
        (-46, 10, 8.5),
        (-46, 12, 1),
        (-55.5, 12, 1),
        (-55.5, 23, 1),
        (-46, 23, 9.5),
        (-44, 23, 7.5),
        (40, 23, 7.5),
        (42, 23, 9.5),
        (51.5, 23, 1),
        (51.5, 12, 1),
        (42, 10, 8.5),
        (42, 12, 1),
        (40, 12, 7.5),
        (-44, 12, 7.5),
    ]]
    fillet(f10_edges, radius=F10_R)


solid = f1_1.part
